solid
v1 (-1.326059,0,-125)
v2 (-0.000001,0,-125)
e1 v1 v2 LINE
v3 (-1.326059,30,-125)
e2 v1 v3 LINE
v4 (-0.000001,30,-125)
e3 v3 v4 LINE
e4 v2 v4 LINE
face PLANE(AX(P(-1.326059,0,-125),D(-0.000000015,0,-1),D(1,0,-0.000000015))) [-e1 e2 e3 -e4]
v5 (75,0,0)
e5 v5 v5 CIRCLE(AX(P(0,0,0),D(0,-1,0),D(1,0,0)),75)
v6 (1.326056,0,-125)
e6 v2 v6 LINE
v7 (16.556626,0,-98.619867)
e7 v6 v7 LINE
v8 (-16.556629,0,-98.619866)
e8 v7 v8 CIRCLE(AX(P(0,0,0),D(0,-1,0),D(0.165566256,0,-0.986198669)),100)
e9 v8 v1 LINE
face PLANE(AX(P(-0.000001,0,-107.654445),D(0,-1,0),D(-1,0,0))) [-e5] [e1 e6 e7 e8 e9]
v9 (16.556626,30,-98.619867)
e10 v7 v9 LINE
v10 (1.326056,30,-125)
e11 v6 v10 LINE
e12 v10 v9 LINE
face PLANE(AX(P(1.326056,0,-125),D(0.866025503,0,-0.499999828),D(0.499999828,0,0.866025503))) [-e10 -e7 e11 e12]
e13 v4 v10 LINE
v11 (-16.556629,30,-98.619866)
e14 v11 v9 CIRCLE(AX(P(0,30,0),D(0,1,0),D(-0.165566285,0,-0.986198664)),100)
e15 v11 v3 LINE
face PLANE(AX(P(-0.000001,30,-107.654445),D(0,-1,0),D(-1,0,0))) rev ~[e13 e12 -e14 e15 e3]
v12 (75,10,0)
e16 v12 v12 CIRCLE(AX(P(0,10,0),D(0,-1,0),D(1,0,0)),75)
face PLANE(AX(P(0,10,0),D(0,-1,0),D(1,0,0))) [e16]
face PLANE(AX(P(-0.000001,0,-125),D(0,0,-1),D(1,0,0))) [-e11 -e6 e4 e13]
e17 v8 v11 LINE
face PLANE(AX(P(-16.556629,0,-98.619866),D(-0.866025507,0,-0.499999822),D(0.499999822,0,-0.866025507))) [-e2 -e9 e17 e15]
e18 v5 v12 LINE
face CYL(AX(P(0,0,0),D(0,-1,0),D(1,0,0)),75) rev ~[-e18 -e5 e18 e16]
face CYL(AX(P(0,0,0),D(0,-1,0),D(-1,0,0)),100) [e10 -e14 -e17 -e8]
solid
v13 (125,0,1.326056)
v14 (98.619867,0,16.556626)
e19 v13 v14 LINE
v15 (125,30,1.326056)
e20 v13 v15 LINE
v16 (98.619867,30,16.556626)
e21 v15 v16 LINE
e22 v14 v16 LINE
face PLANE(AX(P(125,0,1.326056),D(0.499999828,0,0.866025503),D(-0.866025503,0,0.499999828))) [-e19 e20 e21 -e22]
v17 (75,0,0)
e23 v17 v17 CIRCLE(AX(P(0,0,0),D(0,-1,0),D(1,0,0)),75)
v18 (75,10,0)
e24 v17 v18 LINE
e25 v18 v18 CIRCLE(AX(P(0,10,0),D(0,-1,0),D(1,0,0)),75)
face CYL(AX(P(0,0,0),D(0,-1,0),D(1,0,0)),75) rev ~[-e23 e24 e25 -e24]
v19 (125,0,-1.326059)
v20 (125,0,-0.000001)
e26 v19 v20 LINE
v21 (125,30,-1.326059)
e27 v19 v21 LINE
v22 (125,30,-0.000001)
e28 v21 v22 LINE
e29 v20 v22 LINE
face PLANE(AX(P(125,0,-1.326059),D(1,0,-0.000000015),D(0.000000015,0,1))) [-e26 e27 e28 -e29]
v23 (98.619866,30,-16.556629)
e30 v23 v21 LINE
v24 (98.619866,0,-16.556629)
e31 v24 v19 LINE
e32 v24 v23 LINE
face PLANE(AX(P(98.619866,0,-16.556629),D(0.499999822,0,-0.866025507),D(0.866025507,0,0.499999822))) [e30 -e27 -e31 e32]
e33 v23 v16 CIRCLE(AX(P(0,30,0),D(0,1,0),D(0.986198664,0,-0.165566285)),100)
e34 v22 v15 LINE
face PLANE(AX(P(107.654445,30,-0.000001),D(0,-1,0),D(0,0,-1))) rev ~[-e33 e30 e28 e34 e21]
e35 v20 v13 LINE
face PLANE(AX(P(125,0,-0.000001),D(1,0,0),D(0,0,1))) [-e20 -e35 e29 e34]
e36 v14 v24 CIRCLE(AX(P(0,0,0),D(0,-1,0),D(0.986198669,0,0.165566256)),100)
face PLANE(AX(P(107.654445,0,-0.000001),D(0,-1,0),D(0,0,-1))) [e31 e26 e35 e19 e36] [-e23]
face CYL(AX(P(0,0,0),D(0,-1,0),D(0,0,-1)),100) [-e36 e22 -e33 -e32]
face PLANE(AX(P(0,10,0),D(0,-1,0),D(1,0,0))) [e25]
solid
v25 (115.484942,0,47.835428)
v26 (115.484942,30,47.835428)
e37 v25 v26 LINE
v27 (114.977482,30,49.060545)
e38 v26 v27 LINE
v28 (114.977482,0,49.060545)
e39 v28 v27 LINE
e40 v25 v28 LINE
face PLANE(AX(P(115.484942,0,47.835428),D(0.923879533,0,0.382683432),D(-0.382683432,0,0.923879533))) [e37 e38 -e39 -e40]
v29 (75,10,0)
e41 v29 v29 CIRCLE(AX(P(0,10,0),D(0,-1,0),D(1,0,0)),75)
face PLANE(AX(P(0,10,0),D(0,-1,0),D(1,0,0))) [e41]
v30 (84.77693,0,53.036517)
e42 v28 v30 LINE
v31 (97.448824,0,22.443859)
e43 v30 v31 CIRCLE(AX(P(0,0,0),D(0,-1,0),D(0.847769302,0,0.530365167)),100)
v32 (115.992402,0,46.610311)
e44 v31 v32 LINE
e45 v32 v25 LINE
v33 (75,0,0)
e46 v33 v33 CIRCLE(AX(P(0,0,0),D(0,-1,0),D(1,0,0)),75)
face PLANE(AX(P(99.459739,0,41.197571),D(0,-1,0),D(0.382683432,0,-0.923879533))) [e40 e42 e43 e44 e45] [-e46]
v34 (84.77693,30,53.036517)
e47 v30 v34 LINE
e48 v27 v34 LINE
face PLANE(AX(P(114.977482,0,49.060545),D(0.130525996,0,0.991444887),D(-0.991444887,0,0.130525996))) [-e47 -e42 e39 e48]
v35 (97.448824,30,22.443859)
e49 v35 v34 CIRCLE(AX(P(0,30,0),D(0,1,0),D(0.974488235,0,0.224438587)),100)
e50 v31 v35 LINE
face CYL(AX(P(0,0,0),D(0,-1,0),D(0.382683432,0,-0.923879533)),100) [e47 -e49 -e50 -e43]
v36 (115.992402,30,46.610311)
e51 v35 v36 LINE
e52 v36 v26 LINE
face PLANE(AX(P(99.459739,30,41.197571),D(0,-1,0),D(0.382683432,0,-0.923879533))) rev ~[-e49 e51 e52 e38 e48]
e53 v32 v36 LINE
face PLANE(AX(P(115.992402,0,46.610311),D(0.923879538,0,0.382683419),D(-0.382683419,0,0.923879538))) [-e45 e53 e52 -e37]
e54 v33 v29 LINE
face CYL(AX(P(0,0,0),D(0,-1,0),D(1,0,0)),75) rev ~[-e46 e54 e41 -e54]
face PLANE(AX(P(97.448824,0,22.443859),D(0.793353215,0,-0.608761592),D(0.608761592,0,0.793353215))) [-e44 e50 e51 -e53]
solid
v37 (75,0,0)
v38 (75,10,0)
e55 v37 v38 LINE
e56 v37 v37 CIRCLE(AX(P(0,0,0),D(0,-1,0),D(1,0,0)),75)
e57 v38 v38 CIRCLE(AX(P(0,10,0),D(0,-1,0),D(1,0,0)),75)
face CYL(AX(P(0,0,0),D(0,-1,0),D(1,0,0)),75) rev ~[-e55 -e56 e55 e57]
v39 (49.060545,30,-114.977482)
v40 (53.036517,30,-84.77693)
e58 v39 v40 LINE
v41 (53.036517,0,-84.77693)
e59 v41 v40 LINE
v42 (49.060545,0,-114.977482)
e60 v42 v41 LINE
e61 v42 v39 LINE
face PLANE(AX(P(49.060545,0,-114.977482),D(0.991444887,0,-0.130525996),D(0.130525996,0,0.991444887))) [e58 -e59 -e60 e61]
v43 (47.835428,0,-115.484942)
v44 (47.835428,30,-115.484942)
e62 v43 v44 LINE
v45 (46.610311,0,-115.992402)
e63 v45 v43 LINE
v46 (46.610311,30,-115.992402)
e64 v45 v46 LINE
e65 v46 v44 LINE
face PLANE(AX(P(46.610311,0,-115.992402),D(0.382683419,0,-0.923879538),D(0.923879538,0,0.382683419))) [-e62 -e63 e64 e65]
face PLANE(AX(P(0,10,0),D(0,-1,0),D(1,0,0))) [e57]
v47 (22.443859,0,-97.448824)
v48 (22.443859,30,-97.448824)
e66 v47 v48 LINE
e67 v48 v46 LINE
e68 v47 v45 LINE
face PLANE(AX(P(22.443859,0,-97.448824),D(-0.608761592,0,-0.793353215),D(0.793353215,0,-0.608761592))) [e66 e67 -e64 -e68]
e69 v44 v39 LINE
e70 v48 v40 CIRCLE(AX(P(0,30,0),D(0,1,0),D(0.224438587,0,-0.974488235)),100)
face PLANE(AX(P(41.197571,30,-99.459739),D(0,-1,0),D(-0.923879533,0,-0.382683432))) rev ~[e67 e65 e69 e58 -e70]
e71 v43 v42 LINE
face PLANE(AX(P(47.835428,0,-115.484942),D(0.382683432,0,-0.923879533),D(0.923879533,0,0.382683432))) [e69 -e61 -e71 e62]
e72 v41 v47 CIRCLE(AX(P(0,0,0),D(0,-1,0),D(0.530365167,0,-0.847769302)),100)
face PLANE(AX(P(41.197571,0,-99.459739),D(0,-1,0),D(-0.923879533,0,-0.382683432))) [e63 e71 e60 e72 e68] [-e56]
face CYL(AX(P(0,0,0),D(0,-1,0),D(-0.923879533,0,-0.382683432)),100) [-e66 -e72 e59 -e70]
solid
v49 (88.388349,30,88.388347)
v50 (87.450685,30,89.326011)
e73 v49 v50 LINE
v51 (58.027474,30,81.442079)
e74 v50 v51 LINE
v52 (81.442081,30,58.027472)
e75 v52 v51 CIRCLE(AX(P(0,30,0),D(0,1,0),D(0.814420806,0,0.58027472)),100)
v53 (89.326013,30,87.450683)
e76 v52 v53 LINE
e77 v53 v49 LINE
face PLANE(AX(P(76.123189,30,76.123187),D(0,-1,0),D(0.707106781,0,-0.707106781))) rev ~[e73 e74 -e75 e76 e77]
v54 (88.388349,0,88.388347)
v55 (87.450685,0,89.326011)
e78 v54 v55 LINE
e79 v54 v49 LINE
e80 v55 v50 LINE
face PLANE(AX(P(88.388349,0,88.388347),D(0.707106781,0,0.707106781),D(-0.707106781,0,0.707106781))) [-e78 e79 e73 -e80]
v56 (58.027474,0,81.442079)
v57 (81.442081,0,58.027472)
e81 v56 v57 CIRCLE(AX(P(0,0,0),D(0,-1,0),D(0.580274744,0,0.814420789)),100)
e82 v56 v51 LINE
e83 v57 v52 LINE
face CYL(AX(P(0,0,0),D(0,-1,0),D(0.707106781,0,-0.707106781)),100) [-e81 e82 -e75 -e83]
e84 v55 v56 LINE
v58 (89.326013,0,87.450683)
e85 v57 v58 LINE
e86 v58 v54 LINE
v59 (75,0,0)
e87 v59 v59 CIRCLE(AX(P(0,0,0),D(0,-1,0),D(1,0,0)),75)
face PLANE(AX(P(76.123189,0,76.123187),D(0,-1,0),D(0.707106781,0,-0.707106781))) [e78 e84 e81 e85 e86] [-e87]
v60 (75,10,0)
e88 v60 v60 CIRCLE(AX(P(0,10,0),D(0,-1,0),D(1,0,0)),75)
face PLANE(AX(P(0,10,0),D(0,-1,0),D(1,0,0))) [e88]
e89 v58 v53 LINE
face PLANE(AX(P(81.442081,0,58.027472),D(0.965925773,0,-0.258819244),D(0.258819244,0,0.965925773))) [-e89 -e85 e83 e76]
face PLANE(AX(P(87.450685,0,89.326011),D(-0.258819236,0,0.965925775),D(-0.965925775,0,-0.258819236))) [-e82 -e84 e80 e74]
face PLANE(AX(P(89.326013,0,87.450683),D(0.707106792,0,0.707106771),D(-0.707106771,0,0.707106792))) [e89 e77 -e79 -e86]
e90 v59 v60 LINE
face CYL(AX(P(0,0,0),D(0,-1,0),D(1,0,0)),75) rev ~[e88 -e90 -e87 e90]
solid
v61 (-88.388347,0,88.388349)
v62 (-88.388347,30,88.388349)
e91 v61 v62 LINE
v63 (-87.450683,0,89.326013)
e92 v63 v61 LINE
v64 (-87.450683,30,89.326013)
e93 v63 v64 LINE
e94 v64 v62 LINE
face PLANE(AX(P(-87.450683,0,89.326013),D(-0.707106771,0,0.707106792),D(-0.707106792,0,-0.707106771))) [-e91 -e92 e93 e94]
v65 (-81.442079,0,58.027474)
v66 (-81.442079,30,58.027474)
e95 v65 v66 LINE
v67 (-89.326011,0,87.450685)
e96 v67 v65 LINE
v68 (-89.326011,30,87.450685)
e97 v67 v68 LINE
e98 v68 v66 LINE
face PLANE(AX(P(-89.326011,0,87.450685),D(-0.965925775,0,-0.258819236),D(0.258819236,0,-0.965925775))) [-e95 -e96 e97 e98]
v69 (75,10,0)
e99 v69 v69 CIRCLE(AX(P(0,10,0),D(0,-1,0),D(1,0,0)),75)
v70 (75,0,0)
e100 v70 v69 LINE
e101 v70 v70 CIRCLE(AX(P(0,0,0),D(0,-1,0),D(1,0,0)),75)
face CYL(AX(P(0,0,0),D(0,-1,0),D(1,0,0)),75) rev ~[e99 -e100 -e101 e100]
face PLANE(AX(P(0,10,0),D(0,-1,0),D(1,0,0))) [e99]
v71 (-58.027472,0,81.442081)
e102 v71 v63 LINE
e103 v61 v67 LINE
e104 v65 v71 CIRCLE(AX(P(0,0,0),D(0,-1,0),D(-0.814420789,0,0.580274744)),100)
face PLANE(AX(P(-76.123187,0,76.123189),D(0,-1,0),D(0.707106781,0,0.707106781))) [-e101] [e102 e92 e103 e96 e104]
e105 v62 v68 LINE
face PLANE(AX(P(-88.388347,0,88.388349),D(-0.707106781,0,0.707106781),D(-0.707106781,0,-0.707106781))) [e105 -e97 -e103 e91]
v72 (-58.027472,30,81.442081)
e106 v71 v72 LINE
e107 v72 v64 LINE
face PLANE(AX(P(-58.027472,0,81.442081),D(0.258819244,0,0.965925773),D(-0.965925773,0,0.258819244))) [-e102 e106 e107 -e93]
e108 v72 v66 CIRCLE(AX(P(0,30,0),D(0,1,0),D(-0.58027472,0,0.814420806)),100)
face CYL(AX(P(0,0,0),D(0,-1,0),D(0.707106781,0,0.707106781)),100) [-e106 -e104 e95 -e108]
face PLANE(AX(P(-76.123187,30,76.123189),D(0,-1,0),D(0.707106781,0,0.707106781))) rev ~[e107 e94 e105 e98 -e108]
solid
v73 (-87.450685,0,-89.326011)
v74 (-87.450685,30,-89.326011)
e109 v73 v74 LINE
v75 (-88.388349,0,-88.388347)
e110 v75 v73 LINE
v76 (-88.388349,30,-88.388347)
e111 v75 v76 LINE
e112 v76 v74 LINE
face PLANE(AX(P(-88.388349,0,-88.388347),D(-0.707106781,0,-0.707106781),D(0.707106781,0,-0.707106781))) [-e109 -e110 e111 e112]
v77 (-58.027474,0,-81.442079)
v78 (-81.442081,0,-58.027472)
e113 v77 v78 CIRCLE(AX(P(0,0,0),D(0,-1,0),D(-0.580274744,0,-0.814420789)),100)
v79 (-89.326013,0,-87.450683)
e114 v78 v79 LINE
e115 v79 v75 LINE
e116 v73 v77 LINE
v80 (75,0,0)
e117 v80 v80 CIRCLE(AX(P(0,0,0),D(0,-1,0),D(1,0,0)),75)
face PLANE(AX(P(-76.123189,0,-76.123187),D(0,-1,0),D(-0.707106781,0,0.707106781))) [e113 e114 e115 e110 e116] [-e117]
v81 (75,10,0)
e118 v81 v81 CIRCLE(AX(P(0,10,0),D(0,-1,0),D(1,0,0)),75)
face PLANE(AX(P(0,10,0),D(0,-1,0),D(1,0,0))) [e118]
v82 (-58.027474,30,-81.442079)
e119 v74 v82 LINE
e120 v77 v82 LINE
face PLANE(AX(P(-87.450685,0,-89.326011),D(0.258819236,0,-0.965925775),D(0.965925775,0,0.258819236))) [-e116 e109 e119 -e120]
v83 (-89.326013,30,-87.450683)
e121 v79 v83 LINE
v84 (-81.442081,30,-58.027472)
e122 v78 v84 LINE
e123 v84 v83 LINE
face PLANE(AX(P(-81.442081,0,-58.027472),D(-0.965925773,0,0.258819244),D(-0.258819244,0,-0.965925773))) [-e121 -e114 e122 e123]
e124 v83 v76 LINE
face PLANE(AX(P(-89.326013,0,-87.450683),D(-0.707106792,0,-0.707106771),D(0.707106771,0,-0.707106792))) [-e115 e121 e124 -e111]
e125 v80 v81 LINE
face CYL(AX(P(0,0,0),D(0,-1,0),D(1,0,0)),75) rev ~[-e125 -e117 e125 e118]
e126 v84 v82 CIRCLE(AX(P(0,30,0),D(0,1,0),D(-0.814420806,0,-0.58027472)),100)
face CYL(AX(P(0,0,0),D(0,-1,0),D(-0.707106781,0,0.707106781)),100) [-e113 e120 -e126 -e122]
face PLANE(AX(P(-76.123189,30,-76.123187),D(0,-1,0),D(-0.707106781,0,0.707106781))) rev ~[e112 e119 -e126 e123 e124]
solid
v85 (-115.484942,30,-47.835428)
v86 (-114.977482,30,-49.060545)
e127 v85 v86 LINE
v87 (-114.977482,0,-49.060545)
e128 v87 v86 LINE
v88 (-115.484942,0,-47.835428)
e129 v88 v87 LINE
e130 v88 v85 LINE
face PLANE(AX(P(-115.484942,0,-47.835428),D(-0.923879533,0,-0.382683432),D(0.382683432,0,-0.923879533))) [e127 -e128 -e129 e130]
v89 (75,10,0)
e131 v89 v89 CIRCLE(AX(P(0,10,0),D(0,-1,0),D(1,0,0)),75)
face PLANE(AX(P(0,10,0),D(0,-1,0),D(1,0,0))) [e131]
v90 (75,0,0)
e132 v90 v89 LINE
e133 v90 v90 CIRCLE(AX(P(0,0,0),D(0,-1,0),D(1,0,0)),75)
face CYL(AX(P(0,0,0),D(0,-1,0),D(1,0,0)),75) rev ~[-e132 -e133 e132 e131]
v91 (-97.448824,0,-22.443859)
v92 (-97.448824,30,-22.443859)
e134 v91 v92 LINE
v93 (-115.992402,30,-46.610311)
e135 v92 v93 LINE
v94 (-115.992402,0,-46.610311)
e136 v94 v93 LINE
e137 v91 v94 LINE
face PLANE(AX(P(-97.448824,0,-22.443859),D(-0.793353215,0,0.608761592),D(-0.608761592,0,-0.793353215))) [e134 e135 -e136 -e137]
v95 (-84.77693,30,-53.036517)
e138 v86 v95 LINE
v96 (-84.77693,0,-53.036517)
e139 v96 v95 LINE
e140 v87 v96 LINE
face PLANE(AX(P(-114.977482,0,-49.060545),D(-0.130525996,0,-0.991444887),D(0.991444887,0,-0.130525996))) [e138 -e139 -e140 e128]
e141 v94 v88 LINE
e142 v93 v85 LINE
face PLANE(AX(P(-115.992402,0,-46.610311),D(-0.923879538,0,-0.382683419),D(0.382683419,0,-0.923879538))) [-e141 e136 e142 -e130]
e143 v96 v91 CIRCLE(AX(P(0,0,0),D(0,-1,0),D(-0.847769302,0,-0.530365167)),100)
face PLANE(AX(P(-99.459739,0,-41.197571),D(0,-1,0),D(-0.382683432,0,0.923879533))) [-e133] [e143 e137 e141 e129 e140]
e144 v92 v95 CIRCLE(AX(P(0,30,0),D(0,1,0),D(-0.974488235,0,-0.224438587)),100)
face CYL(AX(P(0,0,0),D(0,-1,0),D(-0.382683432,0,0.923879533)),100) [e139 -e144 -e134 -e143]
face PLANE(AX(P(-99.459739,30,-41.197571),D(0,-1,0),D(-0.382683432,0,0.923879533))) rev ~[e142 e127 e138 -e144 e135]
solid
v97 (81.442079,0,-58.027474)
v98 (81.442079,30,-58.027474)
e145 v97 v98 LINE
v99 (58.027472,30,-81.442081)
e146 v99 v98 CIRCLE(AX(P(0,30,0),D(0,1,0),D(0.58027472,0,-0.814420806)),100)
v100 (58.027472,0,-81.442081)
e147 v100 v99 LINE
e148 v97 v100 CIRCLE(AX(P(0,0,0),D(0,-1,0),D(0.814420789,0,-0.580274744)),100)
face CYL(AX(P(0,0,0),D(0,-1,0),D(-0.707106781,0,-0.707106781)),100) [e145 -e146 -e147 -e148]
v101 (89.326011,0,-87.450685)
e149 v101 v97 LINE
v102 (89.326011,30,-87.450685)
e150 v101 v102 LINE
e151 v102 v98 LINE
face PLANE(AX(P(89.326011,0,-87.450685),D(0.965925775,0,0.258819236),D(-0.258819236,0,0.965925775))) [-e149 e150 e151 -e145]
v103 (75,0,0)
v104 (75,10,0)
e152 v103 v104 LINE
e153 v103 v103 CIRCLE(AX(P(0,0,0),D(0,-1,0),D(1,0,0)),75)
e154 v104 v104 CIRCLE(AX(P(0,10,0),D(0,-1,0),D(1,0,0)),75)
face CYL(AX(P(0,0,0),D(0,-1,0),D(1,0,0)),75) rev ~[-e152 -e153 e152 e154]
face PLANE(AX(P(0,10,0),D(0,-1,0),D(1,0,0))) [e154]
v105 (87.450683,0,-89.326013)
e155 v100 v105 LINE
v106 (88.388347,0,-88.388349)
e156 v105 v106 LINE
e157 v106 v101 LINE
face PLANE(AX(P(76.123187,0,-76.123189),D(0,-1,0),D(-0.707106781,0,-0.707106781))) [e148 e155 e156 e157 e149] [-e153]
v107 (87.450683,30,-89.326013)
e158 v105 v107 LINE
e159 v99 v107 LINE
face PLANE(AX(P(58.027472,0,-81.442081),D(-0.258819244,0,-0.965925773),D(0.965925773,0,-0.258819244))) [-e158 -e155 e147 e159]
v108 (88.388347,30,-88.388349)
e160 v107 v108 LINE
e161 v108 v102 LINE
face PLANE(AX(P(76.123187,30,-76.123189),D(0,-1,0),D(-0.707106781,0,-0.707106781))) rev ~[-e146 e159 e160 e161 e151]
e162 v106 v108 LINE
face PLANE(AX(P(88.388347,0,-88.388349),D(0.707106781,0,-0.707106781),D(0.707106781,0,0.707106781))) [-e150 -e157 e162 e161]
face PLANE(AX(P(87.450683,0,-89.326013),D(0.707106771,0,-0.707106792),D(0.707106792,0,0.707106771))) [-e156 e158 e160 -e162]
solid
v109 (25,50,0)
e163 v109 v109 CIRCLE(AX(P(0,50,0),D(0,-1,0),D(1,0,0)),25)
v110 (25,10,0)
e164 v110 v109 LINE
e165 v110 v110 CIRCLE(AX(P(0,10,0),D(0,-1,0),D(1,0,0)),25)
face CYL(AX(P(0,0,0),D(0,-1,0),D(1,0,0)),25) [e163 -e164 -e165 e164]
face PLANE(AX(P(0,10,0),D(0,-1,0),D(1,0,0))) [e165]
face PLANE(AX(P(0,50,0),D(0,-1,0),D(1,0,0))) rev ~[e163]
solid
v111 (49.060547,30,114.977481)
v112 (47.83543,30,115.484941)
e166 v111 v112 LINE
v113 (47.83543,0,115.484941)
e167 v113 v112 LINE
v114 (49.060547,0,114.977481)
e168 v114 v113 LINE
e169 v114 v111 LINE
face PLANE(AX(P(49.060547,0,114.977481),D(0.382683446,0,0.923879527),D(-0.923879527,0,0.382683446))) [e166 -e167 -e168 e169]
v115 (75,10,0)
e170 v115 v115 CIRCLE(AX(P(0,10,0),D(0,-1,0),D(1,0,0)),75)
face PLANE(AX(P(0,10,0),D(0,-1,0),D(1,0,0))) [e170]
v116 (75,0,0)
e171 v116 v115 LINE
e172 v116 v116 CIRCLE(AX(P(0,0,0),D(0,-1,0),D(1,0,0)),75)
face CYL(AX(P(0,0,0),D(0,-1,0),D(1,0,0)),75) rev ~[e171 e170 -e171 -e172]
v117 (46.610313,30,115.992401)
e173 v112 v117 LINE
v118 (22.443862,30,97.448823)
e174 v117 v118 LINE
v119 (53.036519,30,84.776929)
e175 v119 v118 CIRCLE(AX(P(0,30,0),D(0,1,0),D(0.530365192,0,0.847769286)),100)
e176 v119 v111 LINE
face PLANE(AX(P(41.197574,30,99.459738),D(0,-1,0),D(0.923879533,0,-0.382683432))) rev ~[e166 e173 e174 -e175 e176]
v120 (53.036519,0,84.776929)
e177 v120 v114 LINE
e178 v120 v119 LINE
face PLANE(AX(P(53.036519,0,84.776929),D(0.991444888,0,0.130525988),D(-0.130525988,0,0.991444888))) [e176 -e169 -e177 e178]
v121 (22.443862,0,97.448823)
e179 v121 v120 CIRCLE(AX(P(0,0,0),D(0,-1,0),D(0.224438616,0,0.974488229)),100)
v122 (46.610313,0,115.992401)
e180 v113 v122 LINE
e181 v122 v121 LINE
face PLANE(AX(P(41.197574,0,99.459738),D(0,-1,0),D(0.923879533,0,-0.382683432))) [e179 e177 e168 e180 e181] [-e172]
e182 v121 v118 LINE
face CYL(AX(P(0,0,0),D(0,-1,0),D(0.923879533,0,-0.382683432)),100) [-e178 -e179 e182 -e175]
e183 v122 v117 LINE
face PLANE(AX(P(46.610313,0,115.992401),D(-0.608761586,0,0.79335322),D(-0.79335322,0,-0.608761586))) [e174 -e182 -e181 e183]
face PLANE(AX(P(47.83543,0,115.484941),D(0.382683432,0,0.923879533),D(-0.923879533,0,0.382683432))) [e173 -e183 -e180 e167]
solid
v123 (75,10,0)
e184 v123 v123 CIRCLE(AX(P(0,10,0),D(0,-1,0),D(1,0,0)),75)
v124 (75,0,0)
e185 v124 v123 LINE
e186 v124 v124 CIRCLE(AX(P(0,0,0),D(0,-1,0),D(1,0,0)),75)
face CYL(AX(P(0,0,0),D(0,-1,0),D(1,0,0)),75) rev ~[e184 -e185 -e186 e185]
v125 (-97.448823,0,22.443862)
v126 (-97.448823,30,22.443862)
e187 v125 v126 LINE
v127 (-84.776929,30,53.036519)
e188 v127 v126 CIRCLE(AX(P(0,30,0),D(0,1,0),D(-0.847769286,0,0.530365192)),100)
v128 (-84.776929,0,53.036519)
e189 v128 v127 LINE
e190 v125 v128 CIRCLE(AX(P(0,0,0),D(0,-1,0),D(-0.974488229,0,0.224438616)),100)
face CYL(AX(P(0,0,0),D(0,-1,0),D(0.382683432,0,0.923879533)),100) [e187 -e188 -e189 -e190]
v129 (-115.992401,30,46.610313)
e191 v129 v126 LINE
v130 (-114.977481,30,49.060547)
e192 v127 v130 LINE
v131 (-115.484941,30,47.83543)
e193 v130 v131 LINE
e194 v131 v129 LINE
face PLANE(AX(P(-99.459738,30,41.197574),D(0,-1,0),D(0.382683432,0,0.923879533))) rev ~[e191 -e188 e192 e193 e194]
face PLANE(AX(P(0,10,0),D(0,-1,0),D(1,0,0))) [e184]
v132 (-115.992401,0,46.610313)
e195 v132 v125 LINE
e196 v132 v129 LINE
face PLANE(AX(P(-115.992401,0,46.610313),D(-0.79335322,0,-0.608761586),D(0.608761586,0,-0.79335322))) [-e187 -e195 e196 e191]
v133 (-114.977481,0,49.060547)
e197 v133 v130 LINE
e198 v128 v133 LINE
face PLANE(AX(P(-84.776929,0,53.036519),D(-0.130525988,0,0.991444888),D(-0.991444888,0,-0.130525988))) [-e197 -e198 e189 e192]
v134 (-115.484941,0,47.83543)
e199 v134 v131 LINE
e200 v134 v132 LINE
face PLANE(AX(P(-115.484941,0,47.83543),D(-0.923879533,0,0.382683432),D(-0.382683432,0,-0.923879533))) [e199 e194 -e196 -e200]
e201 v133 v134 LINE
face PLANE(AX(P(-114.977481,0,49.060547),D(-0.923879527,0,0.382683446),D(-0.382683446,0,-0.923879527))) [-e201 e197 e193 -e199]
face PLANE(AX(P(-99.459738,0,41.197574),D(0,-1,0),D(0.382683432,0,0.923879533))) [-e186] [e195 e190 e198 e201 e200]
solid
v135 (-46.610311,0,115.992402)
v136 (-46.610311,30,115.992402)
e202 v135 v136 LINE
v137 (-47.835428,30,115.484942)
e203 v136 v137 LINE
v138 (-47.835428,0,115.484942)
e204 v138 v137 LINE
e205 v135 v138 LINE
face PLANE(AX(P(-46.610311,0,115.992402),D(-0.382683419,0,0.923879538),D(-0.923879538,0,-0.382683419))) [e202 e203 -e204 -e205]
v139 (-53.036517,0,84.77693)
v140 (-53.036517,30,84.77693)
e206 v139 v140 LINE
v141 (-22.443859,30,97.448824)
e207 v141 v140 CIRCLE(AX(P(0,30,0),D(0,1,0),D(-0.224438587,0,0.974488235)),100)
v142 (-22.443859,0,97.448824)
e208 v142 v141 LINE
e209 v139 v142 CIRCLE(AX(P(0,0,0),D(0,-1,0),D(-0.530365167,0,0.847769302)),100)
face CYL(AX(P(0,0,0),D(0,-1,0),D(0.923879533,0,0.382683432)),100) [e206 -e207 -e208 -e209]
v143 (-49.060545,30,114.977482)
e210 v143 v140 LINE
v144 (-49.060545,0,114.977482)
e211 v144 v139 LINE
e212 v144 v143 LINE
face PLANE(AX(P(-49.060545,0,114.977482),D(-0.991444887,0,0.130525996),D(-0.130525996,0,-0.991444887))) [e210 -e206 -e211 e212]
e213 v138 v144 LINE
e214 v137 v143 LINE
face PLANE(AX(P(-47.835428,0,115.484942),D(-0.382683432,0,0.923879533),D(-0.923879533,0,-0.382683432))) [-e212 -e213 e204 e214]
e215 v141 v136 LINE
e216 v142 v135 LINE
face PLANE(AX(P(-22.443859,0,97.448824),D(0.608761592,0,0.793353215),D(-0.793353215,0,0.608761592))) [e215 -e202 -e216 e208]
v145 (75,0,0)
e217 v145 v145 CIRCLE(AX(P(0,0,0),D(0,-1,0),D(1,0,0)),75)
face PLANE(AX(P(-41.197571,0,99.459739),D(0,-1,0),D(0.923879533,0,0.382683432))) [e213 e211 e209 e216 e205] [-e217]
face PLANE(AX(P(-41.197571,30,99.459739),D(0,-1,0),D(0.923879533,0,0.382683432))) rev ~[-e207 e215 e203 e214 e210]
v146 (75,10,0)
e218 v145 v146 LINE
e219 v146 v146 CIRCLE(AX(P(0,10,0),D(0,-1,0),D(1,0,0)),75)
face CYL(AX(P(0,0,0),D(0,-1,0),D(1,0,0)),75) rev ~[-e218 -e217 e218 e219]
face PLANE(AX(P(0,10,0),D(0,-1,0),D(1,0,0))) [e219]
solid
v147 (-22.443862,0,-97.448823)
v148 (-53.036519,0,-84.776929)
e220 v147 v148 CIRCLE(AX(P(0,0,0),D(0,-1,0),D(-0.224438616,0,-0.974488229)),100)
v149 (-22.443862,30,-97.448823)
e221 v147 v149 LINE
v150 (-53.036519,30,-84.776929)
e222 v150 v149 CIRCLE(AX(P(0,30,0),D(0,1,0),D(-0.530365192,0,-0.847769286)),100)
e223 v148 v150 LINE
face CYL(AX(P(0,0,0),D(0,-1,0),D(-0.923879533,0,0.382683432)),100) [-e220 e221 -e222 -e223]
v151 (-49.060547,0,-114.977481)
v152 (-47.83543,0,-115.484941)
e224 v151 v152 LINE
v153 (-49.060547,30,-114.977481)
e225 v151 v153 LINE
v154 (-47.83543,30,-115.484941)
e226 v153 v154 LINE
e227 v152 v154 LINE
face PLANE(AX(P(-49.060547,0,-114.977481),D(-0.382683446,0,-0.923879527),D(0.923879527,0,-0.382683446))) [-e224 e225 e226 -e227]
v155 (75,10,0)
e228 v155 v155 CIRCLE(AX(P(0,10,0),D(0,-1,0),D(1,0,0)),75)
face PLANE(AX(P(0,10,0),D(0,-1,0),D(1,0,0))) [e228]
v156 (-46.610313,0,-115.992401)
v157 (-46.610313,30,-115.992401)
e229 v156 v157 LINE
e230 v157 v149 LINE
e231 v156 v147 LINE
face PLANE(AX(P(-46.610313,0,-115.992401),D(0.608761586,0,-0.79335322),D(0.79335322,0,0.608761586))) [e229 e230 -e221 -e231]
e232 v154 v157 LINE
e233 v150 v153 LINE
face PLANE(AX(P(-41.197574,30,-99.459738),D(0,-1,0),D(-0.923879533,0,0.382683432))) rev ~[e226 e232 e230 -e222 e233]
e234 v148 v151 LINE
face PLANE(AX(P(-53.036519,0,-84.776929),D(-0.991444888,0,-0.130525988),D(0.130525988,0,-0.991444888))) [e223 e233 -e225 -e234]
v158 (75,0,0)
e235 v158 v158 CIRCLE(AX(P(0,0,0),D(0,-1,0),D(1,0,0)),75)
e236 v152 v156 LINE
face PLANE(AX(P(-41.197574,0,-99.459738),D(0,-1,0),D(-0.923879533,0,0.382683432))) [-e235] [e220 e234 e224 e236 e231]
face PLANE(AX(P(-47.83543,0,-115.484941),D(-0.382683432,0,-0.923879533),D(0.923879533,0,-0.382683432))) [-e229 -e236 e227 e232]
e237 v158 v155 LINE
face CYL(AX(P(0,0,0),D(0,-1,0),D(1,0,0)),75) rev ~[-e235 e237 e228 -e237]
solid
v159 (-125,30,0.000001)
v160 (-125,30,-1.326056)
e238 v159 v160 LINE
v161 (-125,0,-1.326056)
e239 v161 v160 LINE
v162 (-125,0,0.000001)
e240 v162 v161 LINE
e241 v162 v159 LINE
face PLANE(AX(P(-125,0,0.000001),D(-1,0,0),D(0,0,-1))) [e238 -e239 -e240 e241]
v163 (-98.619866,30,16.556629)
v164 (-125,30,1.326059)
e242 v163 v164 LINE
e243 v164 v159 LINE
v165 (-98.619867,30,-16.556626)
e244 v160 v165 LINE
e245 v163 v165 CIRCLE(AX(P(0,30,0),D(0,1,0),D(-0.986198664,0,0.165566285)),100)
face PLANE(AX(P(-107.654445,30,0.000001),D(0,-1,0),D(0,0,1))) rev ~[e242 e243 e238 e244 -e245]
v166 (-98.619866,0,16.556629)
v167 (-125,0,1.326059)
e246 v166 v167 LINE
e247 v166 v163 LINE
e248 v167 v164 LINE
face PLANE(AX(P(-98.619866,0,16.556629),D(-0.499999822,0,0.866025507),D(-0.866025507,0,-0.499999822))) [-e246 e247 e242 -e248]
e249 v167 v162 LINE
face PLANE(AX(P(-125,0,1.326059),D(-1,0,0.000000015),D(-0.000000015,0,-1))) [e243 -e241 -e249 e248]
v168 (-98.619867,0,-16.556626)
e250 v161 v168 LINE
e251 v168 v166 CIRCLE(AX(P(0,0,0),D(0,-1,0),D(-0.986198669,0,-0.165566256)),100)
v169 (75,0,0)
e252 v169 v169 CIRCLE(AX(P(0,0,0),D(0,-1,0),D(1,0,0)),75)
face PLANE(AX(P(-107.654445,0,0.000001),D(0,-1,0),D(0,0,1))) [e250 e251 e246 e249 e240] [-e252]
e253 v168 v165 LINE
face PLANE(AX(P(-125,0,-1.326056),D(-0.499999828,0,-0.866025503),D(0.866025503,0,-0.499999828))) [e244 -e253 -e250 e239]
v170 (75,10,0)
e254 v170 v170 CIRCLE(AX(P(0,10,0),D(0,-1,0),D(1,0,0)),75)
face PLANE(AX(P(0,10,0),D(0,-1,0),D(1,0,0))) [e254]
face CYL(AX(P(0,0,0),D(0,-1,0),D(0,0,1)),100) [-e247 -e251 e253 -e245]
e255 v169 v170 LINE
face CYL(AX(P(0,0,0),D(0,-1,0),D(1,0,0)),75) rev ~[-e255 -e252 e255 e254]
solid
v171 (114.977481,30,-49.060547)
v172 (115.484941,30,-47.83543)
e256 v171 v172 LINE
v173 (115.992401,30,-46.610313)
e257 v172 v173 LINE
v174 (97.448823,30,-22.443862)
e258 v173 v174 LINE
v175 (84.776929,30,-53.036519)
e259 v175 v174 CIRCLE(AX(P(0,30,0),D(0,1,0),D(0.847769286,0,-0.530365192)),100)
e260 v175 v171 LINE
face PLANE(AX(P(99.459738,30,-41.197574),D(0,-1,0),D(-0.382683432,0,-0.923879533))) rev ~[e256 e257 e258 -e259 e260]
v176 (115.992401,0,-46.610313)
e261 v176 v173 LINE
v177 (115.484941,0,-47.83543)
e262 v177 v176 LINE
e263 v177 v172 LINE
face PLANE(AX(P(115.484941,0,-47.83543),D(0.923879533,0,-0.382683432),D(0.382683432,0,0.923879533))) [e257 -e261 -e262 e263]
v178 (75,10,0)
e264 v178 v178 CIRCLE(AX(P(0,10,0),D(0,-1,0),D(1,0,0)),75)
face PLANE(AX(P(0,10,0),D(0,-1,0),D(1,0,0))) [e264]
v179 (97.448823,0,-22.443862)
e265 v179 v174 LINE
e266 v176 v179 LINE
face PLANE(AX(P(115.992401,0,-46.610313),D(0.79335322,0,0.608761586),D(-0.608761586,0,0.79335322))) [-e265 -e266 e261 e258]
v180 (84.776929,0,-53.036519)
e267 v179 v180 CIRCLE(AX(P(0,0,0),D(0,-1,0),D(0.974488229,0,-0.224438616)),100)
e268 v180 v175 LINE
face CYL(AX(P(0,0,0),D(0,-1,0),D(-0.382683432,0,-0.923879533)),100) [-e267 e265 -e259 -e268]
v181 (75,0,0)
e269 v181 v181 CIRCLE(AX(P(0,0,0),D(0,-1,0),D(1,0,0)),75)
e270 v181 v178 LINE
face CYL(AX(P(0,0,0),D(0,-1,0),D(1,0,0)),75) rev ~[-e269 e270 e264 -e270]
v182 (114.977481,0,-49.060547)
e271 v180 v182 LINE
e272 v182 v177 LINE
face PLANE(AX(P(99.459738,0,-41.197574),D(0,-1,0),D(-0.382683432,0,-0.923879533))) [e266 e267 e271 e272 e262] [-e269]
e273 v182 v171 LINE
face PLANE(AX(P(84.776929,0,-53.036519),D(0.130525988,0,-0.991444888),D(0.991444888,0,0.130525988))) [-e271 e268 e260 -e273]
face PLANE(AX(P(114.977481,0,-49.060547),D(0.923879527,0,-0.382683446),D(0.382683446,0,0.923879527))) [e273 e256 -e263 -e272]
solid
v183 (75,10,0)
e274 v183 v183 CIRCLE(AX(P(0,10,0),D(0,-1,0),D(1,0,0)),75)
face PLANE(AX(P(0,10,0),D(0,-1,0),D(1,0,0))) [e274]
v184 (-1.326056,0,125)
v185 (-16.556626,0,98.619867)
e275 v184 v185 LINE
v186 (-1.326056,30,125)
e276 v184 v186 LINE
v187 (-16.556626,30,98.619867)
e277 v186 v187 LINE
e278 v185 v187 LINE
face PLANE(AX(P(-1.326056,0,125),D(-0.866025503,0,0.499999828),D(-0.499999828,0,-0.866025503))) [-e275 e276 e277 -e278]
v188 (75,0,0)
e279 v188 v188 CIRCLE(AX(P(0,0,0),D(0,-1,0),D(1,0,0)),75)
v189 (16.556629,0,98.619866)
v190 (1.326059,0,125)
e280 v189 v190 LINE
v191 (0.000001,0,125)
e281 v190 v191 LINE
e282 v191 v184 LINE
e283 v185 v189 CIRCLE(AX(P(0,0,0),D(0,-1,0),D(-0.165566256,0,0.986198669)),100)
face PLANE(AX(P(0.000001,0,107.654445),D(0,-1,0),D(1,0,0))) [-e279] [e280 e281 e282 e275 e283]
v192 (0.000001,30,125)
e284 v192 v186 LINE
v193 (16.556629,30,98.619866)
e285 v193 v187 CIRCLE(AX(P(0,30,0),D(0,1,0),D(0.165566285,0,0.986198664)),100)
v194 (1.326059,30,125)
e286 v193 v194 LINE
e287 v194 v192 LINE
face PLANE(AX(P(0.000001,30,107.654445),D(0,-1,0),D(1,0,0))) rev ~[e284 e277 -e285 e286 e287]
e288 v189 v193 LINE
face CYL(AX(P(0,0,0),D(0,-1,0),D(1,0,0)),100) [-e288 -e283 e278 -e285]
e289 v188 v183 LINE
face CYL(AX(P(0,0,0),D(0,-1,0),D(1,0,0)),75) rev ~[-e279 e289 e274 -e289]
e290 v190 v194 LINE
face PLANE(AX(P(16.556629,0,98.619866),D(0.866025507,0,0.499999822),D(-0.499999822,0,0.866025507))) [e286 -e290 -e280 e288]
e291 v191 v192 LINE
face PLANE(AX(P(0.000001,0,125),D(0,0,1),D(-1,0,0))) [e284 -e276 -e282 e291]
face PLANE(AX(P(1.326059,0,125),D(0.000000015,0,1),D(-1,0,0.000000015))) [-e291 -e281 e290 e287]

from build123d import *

# Parameters (mm, degrees)
F0_R     = 100
F1_DEPTH = 30
F3_DEPTH = 30
F5_COUNT = 16
F6_R     = 25
F7_DEPTH = 50
F8_R     = 75
F9_DEPTH = 10


# Not quite as in the source:
# - a feature of the source that left no trace in its solid (it failed there, or was rolled back) is left out


with BuildPart() as f1:
    # F0 (on Front) → F1 (new body)
    with BuildSketch(Plane.XZ):
        Circle(F0_R)
    extrude(amount=-F1_DEPTH)

    # F2 (on face) → F3 (join)
    with BuildSketch(Plane.XZ):
        Polygon((1.3260585624, 124.9999999801), (1.4569e-06, 125), (-1.32605566, 125), (-16.5566256365, 98.6198669008), (16.5566285461, 98.6198664123), align=None)
    extrude(amount=-F3_DEPTH)


with BuildPart() as f5_1:
    # F5: instance of F1
    add(f1.part.rotate(Axis((0, 2.4381279945, 0), (0, -1, 0)), 1 * 360 / F5_COUNT))


with BuildPart() as f5_2:
    # F5: instance of F1
    add(f1.part.rotate(Axis((0, 2.4381279945, 0), (0, -1, 0)), 2 * 360 / F5_COUNT))


with BuildPart() as f5_3:
    # F5: instance of F1
    add(f1.part.rotate(Axis((0, 2.4381279945, 0), (0, -1, 0)), 3 * 360 / F5_COUNT))


with BuildPart() as f5_4:
    # F5: instance of F1
    add(f1.part.rotate(Axis((0, 2.4381279945, 0), (0, -1, 0)), 4 * 360 / F5_COUNT))


with BuildPart() as f5_5:
    # F5: instance of F1
    add(f1.part.rotate(Axis((0, 2.4381279945, 0), (0, -1, 0)), 5 * 360 / F5_COUNT))


with BuildPart() as f5_6:
    # F5: instance of F1
    add(f1.part.rotate(Axis((0, 2.4381279945, 0), (0, -1, 0)), 6 * 360 / F5_COUNT))


with BuildPart() as f5_7:
    # F5: instance of F1
    add(f1.part.rotate(Axis((0, 2.4381279945, 0), (0, -1, 0)), 7 * 360 / F5_COUNT))


with BuildPart() as f5_8:
    # F5: instance of F1
    add(f1.part.rotate(Axis((0, 2.4381279945, 0), (0, -1, 0)), 8 * 360 / F5_COUNT))


with BuildPart() as f5_9:
    # F5: instance of F1
    add(f1.part.rotate(Axis((0, 2.4381279945, 0), (0, -1, 0)), 9 * 360 / F5_COUNT))


with BuildPart() as f5_10:
    # F5: instance of F1
    add(f1.part.rotate(Axis((0, 2.4381279945, 0), (0, -1, 0)), 10 * 360 / F5_COUNT))


with BuildPart() as f5_11:
    # F5: instance of F1
    add(f1.part.rotate(Axis((0, 2.4381279945, 0), (0, -1, 0)), 11 * 360 / F5_COUNT))


with BuildPart() as f5_12:
    # F5: instance of F1
    add(f1.part.rotate(Axis((0, 2.4381279945, 0), (0, -1, 0)), 12 * 360 / F5_COUNT))


with BuildPart() as f5_13:
    # F5: instance of F1
    add(f1.part.rotate(Axis((0, 2.4381279945, 0), (0, -1, 0)), 13 * 360 / F5_COUNT))


with BuildPart() as f5_14:
    # F5: instance of F1
    add(f1.part.rotate(Axis((0, 2.4381279945, 0), (0, -1, 0)), 14 * 360 / F5_COUNT))


with BuildPart() as f5_15:
    # F5: instance of F1
    add(f1.part.rotate(Axis((0, 2.4381279945, 0), (0, -1, 0)), 15 * 360 / F5_COUNT))


with BuildPart() as f7:
    # F6 (on face) → F7 (new body)
    with BuildSketch(Plane.XZ):
        Circle(F6_R)
    extrude(amount=-F7_DEPTH)


with BuildPart() as f9_tool:
    # F8 (on face) → F9 (new body)
    with BuildSketch(Plane.XZ):
        Circle(F8_R)
    extrude(amount=-F9_DEPTH)


with BuildPart() as f1_1:
    add(f1.part)

    # F9: cut by f9_tool
    add(f9_tool.part, mode=Mode.SUBTRACT)


with BuildPart() as f5_1_1:
    add(f5_1.part)

    # F9: cut by f9_tool
    add(f9_tool.part, mode=Mode.SUBTRACT)


with BuildPart() as f5_2_1:
    add(f5_2.part)

    # F9: cut by f9_tool
    add(f9_tool.part, mode=Mode.SUBTRACT)


with BuildPart() as f5_3_1:
    add(f5_3.part)

    # F9: cut by f9_tool
    add(f9_tool.part, mode=Mode.SUBTRACT)


with BuildPart() as f5_4_1:
    add(f5_4.part)

    # F9: cut by f9_tool
    add(f9_tool.part, mode=Mode.SUBTRACT)


with BuildPart() as f5_5_1:
    add(f5_5.part)

    # F9: cut by f9_tool
    add(f9_tool.part, mode=Mode.SUBTRACT)


with BuildPart() as f5_6_1:
    add(f5_6.part)

    # F9: cut by f9_tool
    add(f9_tool.part, mode=Mode.SUBTRACT)


with BuildPart() as f5_7_1:
    add(f5_7.part)

    # F9: cut by f9_tool
    add(f9_tool.part, mode=Mode.SUBTRACT)


with BuildPart() as f5_8_1:
    add(f5_8.part)

    # F9: cut by f9_tool
    add(f9_tool.part, mode=Mode.SUBTRACT)


with BuildPart() as f5_9_1:
    add(f5_9.part)

    # F9: cut by f9_tool
    add(f9_tool.part, mode=Mode.SUBTRACT)


with BuildPart() as f5_10_1:
    add(f5_10.part)

    # F9: cut by f9_tool
    add(f9_tool.part, mode=Mode.SUBTRACT)


with BuildPart() as f5_11_1:
    add(f5_11.part)

    # F9: cut by f9_tool
    add(f9_tool.part, mode=Mode.SUBTRACT)


with BuildPart() as f5_12_1:
    add(f5_12.part)

    # F9: cut by f9_tool
    add(f9_tool.part, mode=Mode.SUBTRACT)


with BuildPart() as f5_13_1:
    add(f5_13.part)

    # F9: cut by f9_tool
    add(f9_tool.part, mode=Mode.SUBTRACT)


with BuildPart() as f5_14_1:
    add(f5_14.part)

    # F9: cut by f9_tool
    add(f9_tool.part, mode=Mode.SUBTRACT)


with BuildPart() as f5_15_1:
    add(f5_15.part)

    # F9: cut by f9_tool
    add(f9_tool.part, mode=Mode.SUBTRACT)


with BuildPart() as f7_1:
    add(f7.part)

    # F9: cut by f9_tool
    add(f9_tool.part, mode=Mode.SUBTRACT)


solid = Compound([f1_1.part, f5_1_1.part, f5_2_1.part, f5_3_1.part, f5_4_1.part, f5_5_1.part, f5_6_1.part, f5_7_1.part, f5_8_1.part, f5_9_1.part, f5_10_1.part, f5_11_1.part, f5_12_1.part, f5_13_1.part, f5_14_1.part, f5_15_1.part, f7_1.part])
